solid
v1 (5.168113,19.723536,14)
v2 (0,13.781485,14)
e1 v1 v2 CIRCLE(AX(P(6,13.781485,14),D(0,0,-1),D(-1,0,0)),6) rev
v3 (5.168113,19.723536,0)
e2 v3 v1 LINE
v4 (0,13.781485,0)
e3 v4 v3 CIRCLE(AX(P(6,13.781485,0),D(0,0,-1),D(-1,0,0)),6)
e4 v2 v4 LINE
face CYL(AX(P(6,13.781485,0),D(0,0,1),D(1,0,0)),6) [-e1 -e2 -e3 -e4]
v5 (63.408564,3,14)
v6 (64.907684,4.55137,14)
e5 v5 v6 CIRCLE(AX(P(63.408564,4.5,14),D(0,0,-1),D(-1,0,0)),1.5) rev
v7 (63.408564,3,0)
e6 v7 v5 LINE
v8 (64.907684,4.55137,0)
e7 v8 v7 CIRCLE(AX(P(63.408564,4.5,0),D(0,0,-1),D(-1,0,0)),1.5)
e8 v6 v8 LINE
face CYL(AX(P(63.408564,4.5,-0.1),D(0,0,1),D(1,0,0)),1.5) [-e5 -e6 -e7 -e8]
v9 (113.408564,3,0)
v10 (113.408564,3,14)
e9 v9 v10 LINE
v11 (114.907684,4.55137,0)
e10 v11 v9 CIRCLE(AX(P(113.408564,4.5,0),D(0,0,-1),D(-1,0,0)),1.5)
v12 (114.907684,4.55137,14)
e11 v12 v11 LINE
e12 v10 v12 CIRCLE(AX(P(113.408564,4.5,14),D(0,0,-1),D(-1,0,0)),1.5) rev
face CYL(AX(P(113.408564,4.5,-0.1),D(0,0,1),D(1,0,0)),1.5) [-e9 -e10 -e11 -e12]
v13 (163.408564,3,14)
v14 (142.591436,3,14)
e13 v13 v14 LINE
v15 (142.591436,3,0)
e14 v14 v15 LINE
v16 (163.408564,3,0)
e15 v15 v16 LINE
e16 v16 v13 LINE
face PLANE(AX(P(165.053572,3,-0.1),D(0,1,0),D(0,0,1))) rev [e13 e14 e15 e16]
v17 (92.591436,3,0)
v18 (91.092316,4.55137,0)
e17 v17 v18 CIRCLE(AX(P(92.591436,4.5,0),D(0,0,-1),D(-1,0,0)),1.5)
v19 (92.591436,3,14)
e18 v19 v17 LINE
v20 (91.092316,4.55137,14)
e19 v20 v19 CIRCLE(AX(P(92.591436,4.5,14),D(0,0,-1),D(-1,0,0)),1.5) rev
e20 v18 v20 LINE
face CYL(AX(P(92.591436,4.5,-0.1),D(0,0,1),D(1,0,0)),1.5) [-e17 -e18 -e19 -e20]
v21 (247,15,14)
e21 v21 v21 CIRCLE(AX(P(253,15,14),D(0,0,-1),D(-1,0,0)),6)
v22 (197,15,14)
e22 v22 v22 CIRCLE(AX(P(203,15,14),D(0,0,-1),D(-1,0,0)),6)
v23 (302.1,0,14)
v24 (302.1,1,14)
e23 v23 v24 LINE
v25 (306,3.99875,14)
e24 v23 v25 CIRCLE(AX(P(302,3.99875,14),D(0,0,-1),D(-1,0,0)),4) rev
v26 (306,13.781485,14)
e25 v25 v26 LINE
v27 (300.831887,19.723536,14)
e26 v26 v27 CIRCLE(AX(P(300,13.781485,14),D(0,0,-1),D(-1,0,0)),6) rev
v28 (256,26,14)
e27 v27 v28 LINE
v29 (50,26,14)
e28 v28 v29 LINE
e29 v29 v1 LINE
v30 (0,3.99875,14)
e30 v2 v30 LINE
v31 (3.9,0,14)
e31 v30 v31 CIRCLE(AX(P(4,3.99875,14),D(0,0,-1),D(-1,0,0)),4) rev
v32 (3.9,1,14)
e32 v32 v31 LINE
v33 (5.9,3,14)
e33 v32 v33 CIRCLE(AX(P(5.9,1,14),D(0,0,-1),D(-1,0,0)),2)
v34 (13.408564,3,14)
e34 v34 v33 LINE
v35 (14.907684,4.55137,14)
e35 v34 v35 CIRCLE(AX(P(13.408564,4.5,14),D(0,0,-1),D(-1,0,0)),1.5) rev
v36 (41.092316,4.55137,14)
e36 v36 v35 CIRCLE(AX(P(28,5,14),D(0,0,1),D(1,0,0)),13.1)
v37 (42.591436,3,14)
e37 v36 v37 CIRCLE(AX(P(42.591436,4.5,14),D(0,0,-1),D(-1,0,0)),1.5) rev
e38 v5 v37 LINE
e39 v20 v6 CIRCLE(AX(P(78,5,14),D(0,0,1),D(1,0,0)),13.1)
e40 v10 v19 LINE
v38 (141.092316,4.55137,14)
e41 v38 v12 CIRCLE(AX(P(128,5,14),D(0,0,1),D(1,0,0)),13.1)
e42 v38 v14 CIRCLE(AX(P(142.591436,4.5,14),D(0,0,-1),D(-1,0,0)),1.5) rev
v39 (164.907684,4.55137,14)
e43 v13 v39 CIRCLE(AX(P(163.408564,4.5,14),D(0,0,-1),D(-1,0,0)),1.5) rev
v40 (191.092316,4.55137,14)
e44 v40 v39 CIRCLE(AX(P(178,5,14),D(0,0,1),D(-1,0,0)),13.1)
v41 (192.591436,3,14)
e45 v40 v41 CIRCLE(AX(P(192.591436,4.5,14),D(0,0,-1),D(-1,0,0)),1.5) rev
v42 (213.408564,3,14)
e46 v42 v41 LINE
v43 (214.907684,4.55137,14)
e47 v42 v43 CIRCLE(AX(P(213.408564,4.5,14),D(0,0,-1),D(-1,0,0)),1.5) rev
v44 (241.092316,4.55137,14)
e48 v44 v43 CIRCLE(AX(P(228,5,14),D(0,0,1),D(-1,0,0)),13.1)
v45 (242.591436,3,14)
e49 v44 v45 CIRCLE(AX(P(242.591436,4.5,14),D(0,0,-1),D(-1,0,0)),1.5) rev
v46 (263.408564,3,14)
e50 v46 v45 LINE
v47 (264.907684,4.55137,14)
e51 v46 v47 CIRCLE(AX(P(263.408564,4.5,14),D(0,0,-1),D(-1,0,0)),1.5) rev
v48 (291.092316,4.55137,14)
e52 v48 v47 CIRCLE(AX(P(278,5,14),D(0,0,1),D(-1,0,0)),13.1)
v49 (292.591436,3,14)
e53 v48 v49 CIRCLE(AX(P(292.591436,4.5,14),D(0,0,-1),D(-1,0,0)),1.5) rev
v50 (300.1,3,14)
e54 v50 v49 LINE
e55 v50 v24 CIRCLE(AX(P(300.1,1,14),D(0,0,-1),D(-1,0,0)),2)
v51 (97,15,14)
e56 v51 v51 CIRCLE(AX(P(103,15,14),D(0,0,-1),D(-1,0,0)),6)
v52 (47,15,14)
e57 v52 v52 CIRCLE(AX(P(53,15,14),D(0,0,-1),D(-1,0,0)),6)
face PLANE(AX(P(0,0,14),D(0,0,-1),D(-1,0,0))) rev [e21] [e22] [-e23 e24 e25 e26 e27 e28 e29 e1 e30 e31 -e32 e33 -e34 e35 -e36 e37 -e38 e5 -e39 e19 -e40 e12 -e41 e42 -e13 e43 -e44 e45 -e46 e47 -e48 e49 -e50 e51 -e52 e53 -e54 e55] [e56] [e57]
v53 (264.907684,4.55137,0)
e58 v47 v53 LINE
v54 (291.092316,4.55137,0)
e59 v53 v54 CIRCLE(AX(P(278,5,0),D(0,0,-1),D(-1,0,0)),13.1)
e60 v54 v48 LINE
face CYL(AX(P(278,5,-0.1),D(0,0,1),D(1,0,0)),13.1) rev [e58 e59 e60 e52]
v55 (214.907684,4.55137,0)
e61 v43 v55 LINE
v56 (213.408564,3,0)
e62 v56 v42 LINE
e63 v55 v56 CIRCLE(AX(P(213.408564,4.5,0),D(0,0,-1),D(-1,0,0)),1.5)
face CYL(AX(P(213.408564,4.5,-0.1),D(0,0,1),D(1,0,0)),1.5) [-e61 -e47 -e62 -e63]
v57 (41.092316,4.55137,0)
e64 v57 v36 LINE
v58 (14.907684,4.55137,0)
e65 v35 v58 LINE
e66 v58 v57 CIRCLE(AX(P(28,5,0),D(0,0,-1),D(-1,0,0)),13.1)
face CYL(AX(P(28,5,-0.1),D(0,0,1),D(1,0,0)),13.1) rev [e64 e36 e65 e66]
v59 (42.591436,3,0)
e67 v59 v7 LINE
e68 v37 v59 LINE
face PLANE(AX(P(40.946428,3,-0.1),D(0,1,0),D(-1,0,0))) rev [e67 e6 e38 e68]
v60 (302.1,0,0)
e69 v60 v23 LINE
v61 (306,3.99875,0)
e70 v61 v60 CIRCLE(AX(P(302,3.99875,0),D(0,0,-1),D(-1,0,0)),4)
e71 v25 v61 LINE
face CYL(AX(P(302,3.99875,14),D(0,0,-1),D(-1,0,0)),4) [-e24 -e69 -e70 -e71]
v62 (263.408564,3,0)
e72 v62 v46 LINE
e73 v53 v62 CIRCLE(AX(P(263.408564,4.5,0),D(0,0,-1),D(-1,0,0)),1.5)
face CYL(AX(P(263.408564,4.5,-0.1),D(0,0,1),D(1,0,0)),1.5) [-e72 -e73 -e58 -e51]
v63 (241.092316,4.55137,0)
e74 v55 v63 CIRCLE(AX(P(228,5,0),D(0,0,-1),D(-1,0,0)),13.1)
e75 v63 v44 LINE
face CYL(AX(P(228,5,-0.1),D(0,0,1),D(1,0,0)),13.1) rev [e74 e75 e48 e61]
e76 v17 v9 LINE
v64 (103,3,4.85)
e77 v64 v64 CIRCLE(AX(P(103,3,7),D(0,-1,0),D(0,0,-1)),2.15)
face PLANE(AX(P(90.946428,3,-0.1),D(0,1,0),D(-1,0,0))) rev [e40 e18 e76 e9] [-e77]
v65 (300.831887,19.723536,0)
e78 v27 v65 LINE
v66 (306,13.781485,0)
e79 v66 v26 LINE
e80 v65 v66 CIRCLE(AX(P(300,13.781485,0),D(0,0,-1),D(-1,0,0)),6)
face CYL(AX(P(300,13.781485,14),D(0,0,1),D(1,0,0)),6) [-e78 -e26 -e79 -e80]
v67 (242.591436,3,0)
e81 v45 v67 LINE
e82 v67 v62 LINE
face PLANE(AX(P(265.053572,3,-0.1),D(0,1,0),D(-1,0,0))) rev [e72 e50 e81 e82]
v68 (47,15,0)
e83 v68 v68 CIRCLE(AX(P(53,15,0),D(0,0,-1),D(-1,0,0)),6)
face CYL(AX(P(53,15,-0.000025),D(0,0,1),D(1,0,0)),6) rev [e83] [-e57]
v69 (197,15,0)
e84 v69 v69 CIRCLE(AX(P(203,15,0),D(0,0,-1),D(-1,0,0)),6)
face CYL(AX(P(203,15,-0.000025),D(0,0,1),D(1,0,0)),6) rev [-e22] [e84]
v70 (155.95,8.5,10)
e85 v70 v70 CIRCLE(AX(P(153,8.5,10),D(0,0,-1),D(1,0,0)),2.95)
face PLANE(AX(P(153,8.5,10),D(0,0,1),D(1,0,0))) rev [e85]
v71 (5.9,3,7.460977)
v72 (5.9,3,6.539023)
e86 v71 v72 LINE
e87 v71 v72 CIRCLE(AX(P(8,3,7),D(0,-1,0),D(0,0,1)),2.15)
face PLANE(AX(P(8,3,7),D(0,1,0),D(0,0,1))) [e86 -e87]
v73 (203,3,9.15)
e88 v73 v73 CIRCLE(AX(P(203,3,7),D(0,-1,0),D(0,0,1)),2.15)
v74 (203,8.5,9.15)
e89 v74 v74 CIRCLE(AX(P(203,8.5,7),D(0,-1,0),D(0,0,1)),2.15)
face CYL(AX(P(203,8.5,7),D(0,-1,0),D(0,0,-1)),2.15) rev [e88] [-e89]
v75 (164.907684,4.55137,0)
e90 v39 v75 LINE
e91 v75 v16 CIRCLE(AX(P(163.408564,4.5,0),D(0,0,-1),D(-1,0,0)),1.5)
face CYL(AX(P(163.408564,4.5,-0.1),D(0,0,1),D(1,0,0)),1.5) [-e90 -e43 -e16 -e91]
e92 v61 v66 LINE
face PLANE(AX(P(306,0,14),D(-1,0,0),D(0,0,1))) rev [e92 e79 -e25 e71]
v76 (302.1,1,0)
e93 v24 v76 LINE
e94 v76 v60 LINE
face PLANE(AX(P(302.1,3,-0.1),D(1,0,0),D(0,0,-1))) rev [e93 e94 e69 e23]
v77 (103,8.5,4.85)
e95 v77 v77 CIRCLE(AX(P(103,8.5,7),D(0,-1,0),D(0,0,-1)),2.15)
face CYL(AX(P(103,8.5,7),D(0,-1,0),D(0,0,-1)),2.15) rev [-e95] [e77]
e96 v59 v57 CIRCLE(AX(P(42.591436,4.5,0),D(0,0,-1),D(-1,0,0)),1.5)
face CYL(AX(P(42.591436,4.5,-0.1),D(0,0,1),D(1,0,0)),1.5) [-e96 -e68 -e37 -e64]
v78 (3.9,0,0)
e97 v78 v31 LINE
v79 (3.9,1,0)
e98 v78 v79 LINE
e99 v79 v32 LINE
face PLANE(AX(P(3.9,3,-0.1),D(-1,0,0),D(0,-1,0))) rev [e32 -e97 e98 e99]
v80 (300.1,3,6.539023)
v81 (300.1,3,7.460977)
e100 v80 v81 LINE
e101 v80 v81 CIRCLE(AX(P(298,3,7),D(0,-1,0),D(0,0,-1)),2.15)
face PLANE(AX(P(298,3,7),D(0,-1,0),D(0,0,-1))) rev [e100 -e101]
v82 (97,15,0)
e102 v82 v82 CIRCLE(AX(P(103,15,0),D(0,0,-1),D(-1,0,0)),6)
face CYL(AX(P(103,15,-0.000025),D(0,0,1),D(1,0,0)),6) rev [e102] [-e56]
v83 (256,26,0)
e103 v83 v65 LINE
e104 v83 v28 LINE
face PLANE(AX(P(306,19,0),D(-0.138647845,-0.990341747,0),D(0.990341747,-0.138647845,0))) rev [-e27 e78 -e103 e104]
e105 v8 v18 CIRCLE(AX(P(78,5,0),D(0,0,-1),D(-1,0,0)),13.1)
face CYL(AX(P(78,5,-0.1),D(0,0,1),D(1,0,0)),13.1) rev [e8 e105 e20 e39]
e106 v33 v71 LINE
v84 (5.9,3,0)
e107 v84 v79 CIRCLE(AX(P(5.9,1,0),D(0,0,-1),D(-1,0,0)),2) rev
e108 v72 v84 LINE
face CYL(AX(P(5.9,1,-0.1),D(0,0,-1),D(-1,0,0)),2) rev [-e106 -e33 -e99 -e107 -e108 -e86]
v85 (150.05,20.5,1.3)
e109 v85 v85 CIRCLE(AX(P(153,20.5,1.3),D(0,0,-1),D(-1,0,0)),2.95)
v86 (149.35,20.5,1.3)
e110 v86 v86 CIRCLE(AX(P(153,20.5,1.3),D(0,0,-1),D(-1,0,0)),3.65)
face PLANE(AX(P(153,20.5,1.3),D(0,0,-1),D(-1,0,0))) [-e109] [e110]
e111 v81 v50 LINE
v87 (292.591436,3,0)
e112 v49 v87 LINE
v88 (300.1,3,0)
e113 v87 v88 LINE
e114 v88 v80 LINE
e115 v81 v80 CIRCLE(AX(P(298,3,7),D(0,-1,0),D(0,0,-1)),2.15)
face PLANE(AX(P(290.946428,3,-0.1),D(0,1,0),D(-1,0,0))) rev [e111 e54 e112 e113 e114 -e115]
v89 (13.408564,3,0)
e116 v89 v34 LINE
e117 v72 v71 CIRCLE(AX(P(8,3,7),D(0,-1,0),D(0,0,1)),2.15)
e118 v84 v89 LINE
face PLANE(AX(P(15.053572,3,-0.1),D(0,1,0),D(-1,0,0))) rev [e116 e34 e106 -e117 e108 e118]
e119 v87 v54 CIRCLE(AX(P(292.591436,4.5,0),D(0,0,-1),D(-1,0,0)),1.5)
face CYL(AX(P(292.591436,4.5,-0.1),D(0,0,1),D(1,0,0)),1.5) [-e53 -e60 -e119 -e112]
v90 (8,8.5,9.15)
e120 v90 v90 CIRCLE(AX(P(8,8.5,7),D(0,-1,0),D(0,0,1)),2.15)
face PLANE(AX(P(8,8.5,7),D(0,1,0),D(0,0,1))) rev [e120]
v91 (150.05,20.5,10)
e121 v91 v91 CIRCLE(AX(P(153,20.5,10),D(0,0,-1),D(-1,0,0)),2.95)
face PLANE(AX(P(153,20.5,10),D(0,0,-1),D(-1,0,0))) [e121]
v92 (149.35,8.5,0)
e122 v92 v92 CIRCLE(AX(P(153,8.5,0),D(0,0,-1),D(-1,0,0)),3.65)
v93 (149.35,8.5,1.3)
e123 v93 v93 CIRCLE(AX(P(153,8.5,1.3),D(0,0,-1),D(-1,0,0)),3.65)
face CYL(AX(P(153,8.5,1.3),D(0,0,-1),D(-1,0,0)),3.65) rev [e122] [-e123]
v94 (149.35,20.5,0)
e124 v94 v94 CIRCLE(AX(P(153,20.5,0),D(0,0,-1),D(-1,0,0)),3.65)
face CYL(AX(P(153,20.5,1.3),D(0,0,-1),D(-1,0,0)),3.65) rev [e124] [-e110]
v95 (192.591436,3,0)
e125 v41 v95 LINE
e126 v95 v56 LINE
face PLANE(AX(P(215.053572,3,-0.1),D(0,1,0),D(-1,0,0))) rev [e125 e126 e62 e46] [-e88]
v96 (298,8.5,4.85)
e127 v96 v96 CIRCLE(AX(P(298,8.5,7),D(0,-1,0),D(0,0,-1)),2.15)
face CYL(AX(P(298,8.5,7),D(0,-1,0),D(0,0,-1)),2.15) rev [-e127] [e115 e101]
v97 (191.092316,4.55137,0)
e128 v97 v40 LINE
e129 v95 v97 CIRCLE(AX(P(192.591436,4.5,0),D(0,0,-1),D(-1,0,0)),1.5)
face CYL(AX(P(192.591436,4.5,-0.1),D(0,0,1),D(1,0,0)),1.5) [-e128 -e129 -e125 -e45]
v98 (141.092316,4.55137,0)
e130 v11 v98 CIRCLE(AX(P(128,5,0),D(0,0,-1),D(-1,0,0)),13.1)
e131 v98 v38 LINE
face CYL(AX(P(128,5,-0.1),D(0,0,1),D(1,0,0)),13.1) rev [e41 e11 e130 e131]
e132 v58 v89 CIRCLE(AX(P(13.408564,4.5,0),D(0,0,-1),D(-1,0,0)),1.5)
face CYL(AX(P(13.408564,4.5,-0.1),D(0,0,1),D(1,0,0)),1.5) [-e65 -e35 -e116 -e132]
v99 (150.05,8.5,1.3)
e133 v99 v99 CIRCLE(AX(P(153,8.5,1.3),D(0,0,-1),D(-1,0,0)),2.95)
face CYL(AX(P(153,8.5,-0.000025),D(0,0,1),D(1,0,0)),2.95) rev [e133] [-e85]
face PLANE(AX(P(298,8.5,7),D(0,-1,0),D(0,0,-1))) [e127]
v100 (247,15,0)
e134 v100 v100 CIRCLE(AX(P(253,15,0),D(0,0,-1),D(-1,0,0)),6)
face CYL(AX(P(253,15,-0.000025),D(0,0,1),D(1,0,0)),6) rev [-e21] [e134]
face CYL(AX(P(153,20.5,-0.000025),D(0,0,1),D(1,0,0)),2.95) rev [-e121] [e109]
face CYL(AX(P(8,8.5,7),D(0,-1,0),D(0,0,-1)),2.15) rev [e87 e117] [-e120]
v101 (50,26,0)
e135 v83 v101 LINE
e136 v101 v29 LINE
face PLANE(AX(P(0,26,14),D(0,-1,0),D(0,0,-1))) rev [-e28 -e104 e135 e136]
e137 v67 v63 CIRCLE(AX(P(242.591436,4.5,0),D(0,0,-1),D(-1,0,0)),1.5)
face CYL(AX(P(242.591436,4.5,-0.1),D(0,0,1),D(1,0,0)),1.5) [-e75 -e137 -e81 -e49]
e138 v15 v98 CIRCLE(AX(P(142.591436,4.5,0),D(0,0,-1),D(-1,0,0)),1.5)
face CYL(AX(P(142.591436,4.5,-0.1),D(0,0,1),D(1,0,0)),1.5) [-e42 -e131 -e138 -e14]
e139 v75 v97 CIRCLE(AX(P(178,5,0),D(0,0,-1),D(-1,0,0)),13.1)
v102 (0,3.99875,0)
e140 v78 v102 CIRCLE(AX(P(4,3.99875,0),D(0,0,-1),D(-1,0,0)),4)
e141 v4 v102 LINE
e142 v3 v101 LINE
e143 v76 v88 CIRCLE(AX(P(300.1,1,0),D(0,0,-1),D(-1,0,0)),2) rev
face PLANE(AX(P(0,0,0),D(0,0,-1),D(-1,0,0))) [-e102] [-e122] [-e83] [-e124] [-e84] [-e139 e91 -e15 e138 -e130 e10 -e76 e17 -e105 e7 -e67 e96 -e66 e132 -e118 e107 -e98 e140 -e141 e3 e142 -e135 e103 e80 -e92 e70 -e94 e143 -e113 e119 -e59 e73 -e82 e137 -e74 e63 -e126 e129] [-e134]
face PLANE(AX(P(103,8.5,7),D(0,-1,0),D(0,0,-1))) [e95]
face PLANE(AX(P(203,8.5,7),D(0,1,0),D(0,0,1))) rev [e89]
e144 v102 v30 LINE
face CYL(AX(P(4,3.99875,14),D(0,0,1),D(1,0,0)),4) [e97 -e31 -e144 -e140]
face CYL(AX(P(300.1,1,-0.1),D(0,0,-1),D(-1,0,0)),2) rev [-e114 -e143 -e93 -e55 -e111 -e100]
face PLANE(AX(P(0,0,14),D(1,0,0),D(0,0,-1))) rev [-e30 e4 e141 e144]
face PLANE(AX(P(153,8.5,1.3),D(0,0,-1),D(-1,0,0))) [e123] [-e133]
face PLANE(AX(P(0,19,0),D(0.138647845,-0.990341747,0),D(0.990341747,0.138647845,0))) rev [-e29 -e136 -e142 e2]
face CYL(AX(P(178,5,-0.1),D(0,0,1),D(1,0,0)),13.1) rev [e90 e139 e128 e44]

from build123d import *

# Parameters (mm, degrees)
ESQUISSE1_W                  = 306
ESQUISSE1_H                  = 26
BOSS_EXTRU_1_DEPTH           = 14
ENL_V_MAT_EXTRU_1_DEPTH      = 14.1
CONG_1_R                     = 1.5
CONG_2_R                     = 2
ENL_V_MAT_EXTRU_2_DEPTH      = 308.421534704
ENL_V_MAT_EXTRU_2_DEPTH_BACK = 308.421534704
CONG_3_R                     = 6
CONG_4_R                     = 4
ENL_V_MAT_EXTRU_3_DEPTH      = 308.421534704
ENL_V_MAT_EXTRU_3_DEPTH_BACK = 10
ESQUISSE4_R                  = 2.95
ESQUISSE6_R                  = 2.15
ENL_V_MAT_EXTRU_5_DEPTH      = 5.5
ENL_V_MAT_EXTRU_6_DEPTH      = 308.421534704
ENL_V_MAT_EXTRU_6_DEPTH_BACK = 308.421534704
ESQUISSE7_R                  = 6
ESQUISSE8_R                  = 3.65
ENL_V_MAT_EXTRU_7_DEPTH      = 1.3


with BuildPart() as part:
    # Esquisse1 → Boss.-Extru.1 (new body)
    with BuildSketch(Plane.XY):
        with Locations((153, 13)):
            Rectangle(ESQUISSE1_W, ESQUISSE1_H)
    extrude(amount=BOSS_EXTRU_1_DEPTH)

    # Esquisse2 → Enlèv. mat.-Extru.1 (cut)
    with BuildSketch(Plane.XY.offset(14)):
        with BuildLine():
            Line((215.053571921, 3), (190.946428079, 3))
            ThreePointArc((190.946428079, 3), (178, 18.1), (165.053571921, 3))
            Line((165.053571921, 3), (140.946428079, 3))
            ThreePointArc((140.946428079, 3), (128, 18.1), (115.053571921, 3))
            Line((115.053571921, 3), (90.946428079, 3))
            ThreePointArc((90.946428079, 3), (78, 18.1), (65.053571921, 3))
            Line((65.053571921, 3), (40.946428079, 3))
            ThreePointArc((40.946428079, 3), (28, 18.1), (15.053571921, 3))
            Line((15.053571921, 3), (3.9, 3))
            Line((3.9, 3), (3.9, 0))
            Line((3.9, 0), (302.1, 0))
            Line((302.1, 0), (302.1, 3))
            Line((302.1, 3), (290.946428079, 3))
            ThreePointArc((290.946428079, 3), (278, 18.1), (265.053571921, 3))
            Line((265.053571921, 3), (240.946428079, 3))
            ThreePointArc((240.946428079, 3), (228, 18.1), (215.053571921, 3))
        make_face()
    extrude(amount=-ENL_V_MAT_EXTRU_1_DEPTH, mode=Mode.SUBTRACT)

    # Congé1
    cong_1_edges = [part.edges().sort_by_distance(p)[0] for p in [
        (165.053571921, 3, 7),
        (190.946428079, 3, 7),
        (215.053571921, 3, 7),
        (240.946428079, 3, 7),
        (265.053571921, 3, 7),
        (290.946428079, 3, 7),
        (15.053571921, 3, 7),
        (40.946428079, 3, 7),
        (65.053571921, 3, 7),
        (90.946428079, 3, 7),
        (115.053571921, 3, 7),
        (140.946428079, 3, 7),
    ]]
    fillet(cong_1_edges, radius=CONG_1_R)

    # Congé2
    cong_2_edges = [part.edges().sort_by_distance(p)[0] for p in [
        (302.1, 3, 7),
        (3.9, 3, 7),
    ]]
    fillet(cong_2_edges, radius=CONG_2_R)

    # Esquisse3 → Enlèv. mat.-Extru.2 (cut, two sides: drawn at the far end of the back side and taken through both)
    with BuildSketch(Plane.XY.offset(14).offset(-ENL_V_MAT_EXTRU_2_DEPTH_BACK)):
        Polygon((0, 19), (50, 26), (0, 26), align=None)
        Polygon((306, 26), (306, 19), (256, 26), align=None)
    extrude(amount=ENL_V_MAT_EXTRU_2_DEPTH + ENL_V_MAT_EXTRU_2_DEPTH_BACK, mode=Mode.SUBTRACT)

    # Congé3
    cong_3_edges = [part.edges().sort_by_distance(p)[0] for p in [
        (0, 19, 7),
        (306, 19, 7),
    ]]
    fillet(cong_3_edges, radius=CONG_3_R)

    # Congé4
    # the kernel refuses this fillet: 4 mm, written as the material it takes off along each edge
    with BuildSketch(Plane(origin=(306, 0, -9.996874512), x_dir=(0, 1, 0), z_dir=(0, 0, 1))) as cong_4_piece_1:
        with BuildLine():
            CenterArc((3.998749805, 4), CONG_4_R, 181.432543738, 88.567456262)
            Line((0, 3.9), (-0.079974996, 3.898))
            ThreePointArc((-0.079974996, 3.898), (-0.08, 1.95), (-0.08, 0))
            Line((-0.08, 0), (0, -0.08))
            Line((0, -0.08), (3.998749805, -0.08))
            Line((3.998749805, -0.08), (3.998749805, 0))
        make_face()
    extrude(amount=33.993749023, mode=Mode.SUBTRACT)
    with BuildSketch(Plane(origin=(0, 0, -9.996874512), x_dir=(0, 1, 0), z_dir=(0, 0, 1))) as cong_4_piece_2:
        with BuildLine():
            CenterArc((3.998749805, -4), CONG_4_R, 90, 88.567456262)
            Line((0, -3.9), (-0.079974996, -3.898))
            ThreePointArc((-0.079974996, -3.898), (-0.08, -1.95), (-0.08, 0))
            Line((-0.08, 0), (0, 0.08))
            Line((0, 0.08), (3.998749805, 0.08))
            Line((3.998749805, 0.08), (3.998749805, 0))
        make_face()
    extrude(amount=33.993749023, mode=Mode.SUBTRACT)

    # Esquisse4 → Enlèv. mat.-Extru.3 (cut, two sides: drawn at the far end of the back side and taken through both)
    with BuildSketch(Plane(origin=(0, 0, 0), x_dir=(-1, 0, 0), z_dir=(0, 0, -1)).offset(-ENL_V_MAT_EXTRU_3_DEPTH_BACK)):
        with Locations((-153, 20.5)):
            Circle(ESQUISSE4_R)
        with Locations(Location((-153, 8.5, 0), (0, 0, 180))):
            Circle(ESQUISSE4_R)
    extrude(amount=ENL_V_MAT_EXTRU_3_DEPTH + ENL_V_MAT_EXTRU_3_DEPTH_BACK, mode=Mode.SUBTRACT)

    # Esquisse6 → Enlèv. mat.-Extru.5 (cut)
    with BuildSketch(Plane.XZ.offset(-3)):
        with Locations(Location((298, 7, 0), (0, 0, 270))):
            Circle(ESQUISSE6_R)
        with Locations(Location((8, 7, 0), (0, 0, 192.380798917))):
            Circle(ESQUISSE6_R)
        with Locations(Location((103, 7, 0), (0, 0, 270))):
            Circle(ESQUISSE6_R)
        with Locations(Location((203, 7, 0), (0, 0, 90))):
            Circle(ESQUISSE6_R)
    extrude(amount=-ENL_V_MAT_EXTRU_5_DEPTH, mode=Mode.SUBTRACT)

    # Esquisse7 → Enlèv. mat.-Extru.6 (cut, two sides: drawn at the far end of the back side and taken through both)
    with BuildSketch(Plane.XY.offset(14).offset(-ENL_V_MAT_EXTRU_6_DEPTH_BACK)):
        with Locations(Location((53, 15, 0), (0, 0, 180))):
            Circle(ESQUISSE7_R)
        with Locations(Location((103, 15, 0), (0, 0, 180))):
            Circle(ESQUISSE7_R)
        with Locations(Location((203, 15, 0), (0, 0, 180))):
            Circle(ESQUISSE7_R)
        with Locations(Location((253, 15, 0), (0, 0, 180))):
            Circle(ESQUISSE7_R)
    extrude(amount=ENL_V_MAT_EXTRU_6_DEPTH + ENL_V_MAT_EXTRU_6_DEPTH_BACK, mode=Mode.SUBTRACT)

    # Esquisse8 → Enlèv. mat.-Extru.7 (cut)
    with BuildSketch(Plane(origin=(0, 0, 0), x_dir=(-1, 0, 0), z_dir=(0, 0, -1))):
        with Locations((-153, 20.5)):
            Circle(ESQUISSE8_R)
        with Locations((-153, 8.5)):
            Circle(ESQUISSE8_R)
    extrude(amount=-ENL_V_MAT_EXTRU_7_DEPTH, mode=Mode.SUBTRACT)


solid = part.part
